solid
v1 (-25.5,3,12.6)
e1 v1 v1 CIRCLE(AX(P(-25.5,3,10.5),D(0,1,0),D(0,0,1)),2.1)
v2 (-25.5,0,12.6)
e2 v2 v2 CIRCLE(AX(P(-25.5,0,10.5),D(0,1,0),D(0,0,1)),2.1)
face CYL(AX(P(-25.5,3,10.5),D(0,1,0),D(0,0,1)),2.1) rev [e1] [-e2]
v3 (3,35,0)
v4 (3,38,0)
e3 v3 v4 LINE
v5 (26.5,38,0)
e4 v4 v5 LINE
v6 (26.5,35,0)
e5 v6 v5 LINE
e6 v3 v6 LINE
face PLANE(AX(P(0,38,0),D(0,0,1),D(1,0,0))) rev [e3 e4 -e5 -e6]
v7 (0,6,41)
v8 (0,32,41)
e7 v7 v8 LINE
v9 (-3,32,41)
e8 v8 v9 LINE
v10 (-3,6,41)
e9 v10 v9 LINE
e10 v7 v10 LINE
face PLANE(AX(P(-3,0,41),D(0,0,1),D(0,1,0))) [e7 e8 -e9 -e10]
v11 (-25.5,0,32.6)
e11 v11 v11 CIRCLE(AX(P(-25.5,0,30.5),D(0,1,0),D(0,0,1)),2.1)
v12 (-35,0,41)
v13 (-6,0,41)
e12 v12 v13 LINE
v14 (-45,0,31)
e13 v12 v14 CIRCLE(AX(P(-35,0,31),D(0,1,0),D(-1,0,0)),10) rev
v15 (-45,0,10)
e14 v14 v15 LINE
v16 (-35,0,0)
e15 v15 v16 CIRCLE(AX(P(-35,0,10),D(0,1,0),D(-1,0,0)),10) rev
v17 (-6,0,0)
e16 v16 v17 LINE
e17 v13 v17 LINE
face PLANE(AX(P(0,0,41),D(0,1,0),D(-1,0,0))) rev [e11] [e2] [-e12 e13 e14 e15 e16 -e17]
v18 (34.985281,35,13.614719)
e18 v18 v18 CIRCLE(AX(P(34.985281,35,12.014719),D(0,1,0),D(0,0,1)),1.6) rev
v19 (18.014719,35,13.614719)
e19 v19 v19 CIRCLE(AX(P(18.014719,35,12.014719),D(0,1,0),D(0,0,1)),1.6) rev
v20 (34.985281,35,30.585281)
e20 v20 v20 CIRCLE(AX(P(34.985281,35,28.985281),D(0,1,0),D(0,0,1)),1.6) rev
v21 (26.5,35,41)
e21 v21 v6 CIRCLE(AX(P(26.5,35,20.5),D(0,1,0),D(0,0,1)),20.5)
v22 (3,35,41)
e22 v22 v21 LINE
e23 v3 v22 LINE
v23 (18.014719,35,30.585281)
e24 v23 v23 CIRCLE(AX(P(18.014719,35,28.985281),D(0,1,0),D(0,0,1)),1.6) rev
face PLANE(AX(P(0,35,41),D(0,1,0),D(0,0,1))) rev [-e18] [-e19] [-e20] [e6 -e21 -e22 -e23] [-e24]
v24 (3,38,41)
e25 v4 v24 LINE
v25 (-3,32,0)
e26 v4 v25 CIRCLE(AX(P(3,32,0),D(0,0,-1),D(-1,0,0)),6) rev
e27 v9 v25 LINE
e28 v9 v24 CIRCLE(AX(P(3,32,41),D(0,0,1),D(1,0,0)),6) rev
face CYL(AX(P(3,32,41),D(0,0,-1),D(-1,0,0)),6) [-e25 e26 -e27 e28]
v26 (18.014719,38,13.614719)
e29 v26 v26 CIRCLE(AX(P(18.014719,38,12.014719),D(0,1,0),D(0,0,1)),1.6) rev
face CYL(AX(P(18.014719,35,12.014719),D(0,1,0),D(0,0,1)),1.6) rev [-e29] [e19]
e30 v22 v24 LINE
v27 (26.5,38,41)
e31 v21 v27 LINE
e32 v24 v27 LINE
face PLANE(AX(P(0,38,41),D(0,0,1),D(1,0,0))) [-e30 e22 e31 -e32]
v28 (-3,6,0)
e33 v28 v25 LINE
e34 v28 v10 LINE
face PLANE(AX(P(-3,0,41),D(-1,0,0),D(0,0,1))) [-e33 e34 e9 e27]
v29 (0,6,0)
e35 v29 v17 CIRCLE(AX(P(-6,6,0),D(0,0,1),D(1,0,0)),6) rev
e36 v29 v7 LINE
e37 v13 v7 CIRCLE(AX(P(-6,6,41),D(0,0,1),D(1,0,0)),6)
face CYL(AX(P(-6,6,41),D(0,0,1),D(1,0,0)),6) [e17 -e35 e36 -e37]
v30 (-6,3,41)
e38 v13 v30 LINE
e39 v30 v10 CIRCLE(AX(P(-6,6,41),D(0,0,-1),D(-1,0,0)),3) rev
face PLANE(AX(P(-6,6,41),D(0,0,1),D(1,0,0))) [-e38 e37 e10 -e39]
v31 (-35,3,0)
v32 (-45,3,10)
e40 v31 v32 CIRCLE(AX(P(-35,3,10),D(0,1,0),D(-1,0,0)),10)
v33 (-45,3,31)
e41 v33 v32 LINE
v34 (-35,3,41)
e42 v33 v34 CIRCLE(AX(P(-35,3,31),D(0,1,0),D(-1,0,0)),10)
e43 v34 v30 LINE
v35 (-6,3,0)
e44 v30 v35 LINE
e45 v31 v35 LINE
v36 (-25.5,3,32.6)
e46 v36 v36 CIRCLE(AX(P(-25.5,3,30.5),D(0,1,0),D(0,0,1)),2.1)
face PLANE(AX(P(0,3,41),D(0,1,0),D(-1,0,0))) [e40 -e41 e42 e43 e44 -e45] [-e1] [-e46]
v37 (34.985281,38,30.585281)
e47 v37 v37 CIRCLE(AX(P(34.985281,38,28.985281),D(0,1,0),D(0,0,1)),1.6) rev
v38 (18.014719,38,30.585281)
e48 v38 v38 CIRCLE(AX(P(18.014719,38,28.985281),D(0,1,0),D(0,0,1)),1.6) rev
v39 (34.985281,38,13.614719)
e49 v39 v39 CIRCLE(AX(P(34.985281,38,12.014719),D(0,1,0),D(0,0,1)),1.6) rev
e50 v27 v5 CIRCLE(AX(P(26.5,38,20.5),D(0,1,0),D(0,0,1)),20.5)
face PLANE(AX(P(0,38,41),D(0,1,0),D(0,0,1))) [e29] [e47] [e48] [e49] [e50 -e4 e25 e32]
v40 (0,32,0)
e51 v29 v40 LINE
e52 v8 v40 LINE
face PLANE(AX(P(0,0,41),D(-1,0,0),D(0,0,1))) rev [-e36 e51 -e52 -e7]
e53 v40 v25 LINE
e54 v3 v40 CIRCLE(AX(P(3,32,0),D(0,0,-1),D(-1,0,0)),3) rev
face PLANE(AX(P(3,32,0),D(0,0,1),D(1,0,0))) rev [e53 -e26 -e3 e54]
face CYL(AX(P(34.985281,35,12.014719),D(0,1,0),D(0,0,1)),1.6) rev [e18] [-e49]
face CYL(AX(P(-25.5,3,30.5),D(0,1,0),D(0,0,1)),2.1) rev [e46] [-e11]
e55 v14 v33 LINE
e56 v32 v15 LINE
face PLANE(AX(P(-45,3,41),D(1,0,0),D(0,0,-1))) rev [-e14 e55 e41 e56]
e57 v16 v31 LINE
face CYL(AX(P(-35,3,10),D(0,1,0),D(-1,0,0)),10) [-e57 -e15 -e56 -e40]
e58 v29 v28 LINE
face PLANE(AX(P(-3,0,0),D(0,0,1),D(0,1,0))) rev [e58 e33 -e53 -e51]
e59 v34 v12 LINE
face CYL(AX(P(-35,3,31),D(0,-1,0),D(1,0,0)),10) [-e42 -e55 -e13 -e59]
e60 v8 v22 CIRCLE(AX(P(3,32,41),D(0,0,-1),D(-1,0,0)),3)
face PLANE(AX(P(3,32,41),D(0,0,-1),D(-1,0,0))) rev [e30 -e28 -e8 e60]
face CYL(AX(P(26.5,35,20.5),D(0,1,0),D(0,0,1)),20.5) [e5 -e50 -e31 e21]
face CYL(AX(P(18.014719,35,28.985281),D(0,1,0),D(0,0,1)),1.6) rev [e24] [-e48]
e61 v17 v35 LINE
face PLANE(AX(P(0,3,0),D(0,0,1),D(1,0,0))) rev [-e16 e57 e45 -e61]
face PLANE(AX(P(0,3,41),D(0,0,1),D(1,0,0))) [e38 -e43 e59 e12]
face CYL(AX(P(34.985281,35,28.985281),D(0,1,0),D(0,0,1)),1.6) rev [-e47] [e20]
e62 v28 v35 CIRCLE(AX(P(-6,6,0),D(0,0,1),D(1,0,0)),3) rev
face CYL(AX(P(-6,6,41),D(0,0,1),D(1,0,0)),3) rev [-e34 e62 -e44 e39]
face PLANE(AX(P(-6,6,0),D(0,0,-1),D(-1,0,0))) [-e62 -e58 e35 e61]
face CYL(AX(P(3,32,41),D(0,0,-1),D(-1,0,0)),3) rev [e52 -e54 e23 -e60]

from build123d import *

# Parameters (mm, degrees)
EXTRUDE_THIN1_DEPTH    = 41
CONVERT_SOLID1_DEPTH   = 41
CONVERT_SOLID1_2_DEPTH = 41
SKETCH6_R              = 1.6
CUT_EXTRUDE1_DEPTH     = 3
M5X0_8_TAPPED_HOLE1_D  = 4.2
FILLET1_R              = 10


# Read off the part's stored shape, not the designer's step: Convert-Solid1
with BuildPart() as part:
    # Sketch1 → Extrude-Thin1 (new body)
    with BuildSketch(Plane.XY):
        Polygon((50, 35), (0, 35), (0, 0), (-45, 0), (-45, 3), (-3, 3), (-3, 38), (50, 38), align=None)
    extrude(amount=EXTRUDE_THIN1_DEPTH)

    # Convert-Solid1 outline → Convert-Solid1 (cut)
    with BuildSketch(Plane.XY):
        with BuildLine():
            Line((-3, 38), (-3, 32))
            ThreePointArc((-3, 32), (-1.242640687, 36.242640687), (3, 38))
            Line((3, 38), (-3, 38))
        make_face()
        with BuildLine():
            Line((0, 0), (0, 6))
            ThreePointArc((0, 6), (-1.757359313, 1.757359313), (-6, 0))
            Line((-6, 0), (0, 0))
        make_face()
    extrude(amount=CONVERT_SOLID1_DEPTH, mode=Mode.SUBTRACT)

    # Convert-Solid1 2 outline → Convert-Solid1 2 (add)
    with BuildSketch(Plane.XY):
        with BuildLine():
            Line((-3, 3), (-3, 6))
            ThreePointArc((-3, 6), (-3.878679656, 3.878679656), (-6, 3))
            Line((-6, 3), (-3, 3))
        make_face()
        with BuildLine():
            Line((0, 35), (0, 32))
            ThreePointArc((0, 32), (0.878679656, 34.121320344), (3, 35))
            Line((3, 35), (0, 35))
        make_face()
    extrude(amount=CONVERT_SOLID1_2_DEPTH)

    # Sketch6 → Cut-Extrude1 (cut)
    with BuildSketch(Plane(origin=(0, 38, 0), x_dir=(1, 0, 0), z_dir=(0, 1, 0))):
        with Locations(Location((34.985281374, -12.014718626, 0), (0, 0, 270))):
            Circle(SKETCH6_R)
        with Locations(Location((34.985281374, -28.985281374, 0), (0, 0, 270))):
            Circle(SKETCH6_R)
        with Locations(Location((18.014718626, -28.985281374, 0), (0, 0, 270))):
            Circle(SKETCH6_R)
        with Locations(Location((18.014718626, -12.014718626, 0), (0, 0, 270))):
            Circle(SKETCH6_R)
        with BuildLine():
            Line((51.105144577, 0), (51.105144577, -41))
            Line((51.105144577, -41), (26.5, -41))
            ThreePointArc((26.5, -41), (47, -20.5), (26.5, 0))
            Line((26.5, 0), (51.105144577, 0))
        make_face()
    extrude(amount=-CUT_EXTRUDE1_DEPTH, mode=Mode.SUBTRACT)

    # M5x0.8 Tapped Hole1 (through all)
    with Locations(Plane(origin=(0, 3, 0), x_dir=(1, 0, 0), z_dir=(0, 1, 0))):
        with Locations((-25.5, -30.5), (-25.5, -10.5)):
            Hole(M5X0_8_TAPPED_HOLE1_D / 2)

    # Fillet1
    fillet1_edges = [part.edges().sort_by_distance(p)[0] for p in [
        (-45, 1.5, 41),
        (-45, 1.5, 0),
    ]]
    fillet(fillet1_edges, radius=FILLET1_R)


solid = part.part
